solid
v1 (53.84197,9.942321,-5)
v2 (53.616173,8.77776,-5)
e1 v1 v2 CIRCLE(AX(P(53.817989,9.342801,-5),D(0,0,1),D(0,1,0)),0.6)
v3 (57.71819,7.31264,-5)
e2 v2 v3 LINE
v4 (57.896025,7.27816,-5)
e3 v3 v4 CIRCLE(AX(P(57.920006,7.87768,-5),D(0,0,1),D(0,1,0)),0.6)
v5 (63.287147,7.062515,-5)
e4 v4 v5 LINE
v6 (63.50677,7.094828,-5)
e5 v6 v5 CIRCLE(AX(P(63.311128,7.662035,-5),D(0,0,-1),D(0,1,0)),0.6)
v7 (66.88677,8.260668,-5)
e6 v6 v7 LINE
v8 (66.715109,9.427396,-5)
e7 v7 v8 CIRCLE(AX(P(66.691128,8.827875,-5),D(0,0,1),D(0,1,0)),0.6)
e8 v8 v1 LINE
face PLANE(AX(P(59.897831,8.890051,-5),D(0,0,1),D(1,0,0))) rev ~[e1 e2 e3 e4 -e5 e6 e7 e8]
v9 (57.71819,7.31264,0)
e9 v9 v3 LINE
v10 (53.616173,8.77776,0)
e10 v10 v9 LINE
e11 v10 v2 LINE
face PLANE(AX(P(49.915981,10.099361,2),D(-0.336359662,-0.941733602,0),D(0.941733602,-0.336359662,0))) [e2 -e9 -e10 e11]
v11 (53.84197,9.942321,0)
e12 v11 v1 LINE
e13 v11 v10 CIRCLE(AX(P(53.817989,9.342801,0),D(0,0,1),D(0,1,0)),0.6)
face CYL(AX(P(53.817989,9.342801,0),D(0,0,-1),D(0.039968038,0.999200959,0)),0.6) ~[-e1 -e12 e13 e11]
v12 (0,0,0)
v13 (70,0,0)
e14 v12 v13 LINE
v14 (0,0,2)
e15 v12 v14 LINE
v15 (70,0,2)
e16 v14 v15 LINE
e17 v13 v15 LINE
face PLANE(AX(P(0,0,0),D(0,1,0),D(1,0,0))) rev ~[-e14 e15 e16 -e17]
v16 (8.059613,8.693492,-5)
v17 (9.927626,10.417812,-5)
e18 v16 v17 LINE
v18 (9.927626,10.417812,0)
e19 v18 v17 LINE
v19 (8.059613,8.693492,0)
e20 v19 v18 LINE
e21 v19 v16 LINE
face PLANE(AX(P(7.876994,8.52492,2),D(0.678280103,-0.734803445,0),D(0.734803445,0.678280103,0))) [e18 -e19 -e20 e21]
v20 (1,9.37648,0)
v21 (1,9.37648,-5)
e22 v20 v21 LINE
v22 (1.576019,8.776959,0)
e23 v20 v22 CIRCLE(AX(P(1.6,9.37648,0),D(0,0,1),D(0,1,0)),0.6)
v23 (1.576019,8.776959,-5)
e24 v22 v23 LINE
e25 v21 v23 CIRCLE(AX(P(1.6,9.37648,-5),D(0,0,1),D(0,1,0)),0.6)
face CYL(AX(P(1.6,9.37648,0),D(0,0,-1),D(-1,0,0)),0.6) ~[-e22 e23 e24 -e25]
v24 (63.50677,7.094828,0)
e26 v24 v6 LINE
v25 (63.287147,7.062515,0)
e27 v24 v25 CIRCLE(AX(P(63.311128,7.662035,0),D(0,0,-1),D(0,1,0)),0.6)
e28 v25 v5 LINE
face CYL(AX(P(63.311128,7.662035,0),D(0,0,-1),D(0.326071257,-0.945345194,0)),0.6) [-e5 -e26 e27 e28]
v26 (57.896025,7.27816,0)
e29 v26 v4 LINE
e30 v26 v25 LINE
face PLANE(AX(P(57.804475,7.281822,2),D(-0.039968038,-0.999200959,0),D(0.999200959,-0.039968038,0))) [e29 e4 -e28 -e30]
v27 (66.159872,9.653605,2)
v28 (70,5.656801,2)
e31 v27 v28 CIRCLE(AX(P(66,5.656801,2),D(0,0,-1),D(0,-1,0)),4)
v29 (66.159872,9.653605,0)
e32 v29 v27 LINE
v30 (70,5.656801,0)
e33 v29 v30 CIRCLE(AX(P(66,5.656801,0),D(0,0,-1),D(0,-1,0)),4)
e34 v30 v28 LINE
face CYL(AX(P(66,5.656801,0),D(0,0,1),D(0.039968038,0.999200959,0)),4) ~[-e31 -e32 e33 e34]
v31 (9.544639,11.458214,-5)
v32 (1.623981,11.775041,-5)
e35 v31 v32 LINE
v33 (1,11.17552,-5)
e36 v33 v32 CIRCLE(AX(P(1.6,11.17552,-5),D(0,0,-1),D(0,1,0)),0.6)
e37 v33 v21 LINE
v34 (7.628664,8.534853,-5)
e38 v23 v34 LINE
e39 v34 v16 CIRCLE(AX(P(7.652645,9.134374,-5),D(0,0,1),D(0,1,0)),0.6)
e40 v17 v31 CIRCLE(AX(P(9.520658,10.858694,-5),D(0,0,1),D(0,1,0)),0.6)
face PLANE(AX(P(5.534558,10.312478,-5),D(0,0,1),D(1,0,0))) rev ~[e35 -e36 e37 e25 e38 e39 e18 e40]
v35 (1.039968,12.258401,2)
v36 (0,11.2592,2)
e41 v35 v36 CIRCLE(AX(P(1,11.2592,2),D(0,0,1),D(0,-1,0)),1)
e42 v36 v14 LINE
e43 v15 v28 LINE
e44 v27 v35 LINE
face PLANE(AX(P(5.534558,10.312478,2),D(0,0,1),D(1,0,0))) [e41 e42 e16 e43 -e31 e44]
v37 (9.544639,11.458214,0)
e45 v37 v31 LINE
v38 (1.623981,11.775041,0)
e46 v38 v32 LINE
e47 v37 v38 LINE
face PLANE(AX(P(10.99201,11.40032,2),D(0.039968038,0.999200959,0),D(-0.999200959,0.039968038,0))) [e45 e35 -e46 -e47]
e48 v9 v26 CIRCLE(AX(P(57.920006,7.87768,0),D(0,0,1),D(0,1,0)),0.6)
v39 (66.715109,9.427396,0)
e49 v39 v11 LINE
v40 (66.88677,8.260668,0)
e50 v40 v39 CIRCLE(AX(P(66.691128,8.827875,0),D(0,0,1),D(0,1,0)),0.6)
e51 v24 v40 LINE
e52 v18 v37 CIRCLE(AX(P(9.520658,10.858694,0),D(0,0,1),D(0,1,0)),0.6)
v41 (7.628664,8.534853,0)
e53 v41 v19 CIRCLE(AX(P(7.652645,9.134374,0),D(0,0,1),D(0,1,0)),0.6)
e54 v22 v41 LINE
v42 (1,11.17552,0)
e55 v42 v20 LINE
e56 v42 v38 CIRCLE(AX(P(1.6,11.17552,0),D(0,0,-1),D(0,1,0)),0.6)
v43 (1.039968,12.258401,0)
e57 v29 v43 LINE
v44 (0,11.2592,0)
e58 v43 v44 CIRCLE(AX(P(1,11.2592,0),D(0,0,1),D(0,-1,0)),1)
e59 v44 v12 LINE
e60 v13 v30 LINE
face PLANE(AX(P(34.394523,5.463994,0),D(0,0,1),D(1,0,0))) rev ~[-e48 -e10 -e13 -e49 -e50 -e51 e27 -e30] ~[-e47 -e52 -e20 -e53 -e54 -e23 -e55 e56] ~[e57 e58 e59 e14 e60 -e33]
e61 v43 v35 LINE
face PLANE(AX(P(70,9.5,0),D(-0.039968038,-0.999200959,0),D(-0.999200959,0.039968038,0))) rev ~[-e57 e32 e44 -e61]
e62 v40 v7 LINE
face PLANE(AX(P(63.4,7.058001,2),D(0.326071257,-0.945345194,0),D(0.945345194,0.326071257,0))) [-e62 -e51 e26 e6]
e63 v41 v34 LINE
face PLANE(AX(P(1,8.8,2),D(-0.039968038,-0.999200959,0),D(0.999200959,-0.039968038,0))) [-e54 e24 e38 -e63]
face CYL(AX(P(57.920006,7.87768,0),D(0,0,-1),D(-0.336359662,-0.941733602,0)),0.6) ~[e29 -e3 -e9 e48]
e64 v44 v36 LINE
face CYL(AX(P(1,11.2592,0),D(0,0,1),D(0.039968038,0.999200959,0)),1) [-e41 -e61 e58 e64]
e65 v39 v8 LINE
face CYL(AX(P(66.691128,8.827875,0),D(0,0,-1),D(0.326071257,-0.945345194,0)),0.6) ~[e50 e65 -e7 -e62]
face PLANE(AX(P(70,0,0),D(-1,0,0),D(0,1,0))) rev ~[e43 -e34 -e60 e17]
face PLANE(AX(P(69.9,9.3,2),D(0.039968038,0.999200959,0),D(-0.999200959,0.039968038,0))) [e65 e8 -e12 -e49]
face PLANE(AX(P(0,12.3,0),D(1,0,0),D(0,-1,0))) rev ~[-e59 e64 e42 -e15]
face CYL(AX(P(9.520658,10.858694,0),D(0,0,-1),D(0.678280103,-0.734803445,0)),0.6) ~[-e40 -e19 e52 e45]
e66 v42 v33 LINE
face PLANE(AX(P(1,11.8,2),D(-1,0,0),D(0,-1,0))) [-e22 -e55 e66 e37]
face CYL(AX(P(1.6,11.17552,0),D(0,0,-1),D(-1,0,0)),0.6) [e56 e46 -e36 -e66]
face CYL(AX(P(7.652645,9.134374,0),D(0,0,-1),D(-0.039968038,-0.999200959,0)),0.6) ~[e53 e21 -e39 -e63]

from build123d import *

# Parameters (mm, degrees)
F1_DEPTH = 2
F3_DEPTH = 7
F4_R     = 0.6
F5_R     = 4
F6_R     = 1


# Not quite as in the source:
# - a feature of the source that left no trace in its solid (it failed there, or was rolled back) is left out


with BuildPart() as f1:
    # F0 (on Top) → F1 (new body)
    with BuildSketch(Plane.XY):
        Polygon((0, 12.3), (0, 0), (70, 0), (70, 9.5), align=None)
    extrude(amount=F1_DEPTH)

    # F2 (on face) → F3 (join)
    with BuildSketch(Plane.XY.offset(2)):
        Polygon((1, 11.8), (1, 8.8), (7.8769936128, 8.5249202555), (10.9920095872, 11.4003196165), align=None)
        Polygon((63.4, 7.0580007994), (69.9, 9.3), (49.9159808256, 10.099360767), (57.8044746312, 7.2818218141), align=None)
    extrude(amount=-F3_DEPTH)

    # F4
    f4_edges = [f1.edges().sort_by_distance(p)[0] for p in [
        (1, 11.8, -2.5),
        (10.99201, 11.40032, -2.5),
        (69.9, 9.3, -2.5),
        (49.915981, 10.099361, -2.5),
        (63.4, 7.058001, -2.5),
        (57.804475, 7.281822, -2.5),
        (1, 8.8, -2.5),
        (7.876994, 8.52492, -2.5),
    ]]
    fillet(f4_edges, radius=F4_R)

    # F5
    f5_edges = [f1.edges().sort_by_distance(p)[0] for p in [
        (70, 9.5, 1),
    ]]
    fillet(f5_edges, radius=F5_R)

    # F6
    f6_edges = [f1.edges().sort_by_distance(p)[0] for p in [
        (0, 12.3, 1),
    ]]
    fillet(f6_edges, radius=F6_R)


solid = f1.part
